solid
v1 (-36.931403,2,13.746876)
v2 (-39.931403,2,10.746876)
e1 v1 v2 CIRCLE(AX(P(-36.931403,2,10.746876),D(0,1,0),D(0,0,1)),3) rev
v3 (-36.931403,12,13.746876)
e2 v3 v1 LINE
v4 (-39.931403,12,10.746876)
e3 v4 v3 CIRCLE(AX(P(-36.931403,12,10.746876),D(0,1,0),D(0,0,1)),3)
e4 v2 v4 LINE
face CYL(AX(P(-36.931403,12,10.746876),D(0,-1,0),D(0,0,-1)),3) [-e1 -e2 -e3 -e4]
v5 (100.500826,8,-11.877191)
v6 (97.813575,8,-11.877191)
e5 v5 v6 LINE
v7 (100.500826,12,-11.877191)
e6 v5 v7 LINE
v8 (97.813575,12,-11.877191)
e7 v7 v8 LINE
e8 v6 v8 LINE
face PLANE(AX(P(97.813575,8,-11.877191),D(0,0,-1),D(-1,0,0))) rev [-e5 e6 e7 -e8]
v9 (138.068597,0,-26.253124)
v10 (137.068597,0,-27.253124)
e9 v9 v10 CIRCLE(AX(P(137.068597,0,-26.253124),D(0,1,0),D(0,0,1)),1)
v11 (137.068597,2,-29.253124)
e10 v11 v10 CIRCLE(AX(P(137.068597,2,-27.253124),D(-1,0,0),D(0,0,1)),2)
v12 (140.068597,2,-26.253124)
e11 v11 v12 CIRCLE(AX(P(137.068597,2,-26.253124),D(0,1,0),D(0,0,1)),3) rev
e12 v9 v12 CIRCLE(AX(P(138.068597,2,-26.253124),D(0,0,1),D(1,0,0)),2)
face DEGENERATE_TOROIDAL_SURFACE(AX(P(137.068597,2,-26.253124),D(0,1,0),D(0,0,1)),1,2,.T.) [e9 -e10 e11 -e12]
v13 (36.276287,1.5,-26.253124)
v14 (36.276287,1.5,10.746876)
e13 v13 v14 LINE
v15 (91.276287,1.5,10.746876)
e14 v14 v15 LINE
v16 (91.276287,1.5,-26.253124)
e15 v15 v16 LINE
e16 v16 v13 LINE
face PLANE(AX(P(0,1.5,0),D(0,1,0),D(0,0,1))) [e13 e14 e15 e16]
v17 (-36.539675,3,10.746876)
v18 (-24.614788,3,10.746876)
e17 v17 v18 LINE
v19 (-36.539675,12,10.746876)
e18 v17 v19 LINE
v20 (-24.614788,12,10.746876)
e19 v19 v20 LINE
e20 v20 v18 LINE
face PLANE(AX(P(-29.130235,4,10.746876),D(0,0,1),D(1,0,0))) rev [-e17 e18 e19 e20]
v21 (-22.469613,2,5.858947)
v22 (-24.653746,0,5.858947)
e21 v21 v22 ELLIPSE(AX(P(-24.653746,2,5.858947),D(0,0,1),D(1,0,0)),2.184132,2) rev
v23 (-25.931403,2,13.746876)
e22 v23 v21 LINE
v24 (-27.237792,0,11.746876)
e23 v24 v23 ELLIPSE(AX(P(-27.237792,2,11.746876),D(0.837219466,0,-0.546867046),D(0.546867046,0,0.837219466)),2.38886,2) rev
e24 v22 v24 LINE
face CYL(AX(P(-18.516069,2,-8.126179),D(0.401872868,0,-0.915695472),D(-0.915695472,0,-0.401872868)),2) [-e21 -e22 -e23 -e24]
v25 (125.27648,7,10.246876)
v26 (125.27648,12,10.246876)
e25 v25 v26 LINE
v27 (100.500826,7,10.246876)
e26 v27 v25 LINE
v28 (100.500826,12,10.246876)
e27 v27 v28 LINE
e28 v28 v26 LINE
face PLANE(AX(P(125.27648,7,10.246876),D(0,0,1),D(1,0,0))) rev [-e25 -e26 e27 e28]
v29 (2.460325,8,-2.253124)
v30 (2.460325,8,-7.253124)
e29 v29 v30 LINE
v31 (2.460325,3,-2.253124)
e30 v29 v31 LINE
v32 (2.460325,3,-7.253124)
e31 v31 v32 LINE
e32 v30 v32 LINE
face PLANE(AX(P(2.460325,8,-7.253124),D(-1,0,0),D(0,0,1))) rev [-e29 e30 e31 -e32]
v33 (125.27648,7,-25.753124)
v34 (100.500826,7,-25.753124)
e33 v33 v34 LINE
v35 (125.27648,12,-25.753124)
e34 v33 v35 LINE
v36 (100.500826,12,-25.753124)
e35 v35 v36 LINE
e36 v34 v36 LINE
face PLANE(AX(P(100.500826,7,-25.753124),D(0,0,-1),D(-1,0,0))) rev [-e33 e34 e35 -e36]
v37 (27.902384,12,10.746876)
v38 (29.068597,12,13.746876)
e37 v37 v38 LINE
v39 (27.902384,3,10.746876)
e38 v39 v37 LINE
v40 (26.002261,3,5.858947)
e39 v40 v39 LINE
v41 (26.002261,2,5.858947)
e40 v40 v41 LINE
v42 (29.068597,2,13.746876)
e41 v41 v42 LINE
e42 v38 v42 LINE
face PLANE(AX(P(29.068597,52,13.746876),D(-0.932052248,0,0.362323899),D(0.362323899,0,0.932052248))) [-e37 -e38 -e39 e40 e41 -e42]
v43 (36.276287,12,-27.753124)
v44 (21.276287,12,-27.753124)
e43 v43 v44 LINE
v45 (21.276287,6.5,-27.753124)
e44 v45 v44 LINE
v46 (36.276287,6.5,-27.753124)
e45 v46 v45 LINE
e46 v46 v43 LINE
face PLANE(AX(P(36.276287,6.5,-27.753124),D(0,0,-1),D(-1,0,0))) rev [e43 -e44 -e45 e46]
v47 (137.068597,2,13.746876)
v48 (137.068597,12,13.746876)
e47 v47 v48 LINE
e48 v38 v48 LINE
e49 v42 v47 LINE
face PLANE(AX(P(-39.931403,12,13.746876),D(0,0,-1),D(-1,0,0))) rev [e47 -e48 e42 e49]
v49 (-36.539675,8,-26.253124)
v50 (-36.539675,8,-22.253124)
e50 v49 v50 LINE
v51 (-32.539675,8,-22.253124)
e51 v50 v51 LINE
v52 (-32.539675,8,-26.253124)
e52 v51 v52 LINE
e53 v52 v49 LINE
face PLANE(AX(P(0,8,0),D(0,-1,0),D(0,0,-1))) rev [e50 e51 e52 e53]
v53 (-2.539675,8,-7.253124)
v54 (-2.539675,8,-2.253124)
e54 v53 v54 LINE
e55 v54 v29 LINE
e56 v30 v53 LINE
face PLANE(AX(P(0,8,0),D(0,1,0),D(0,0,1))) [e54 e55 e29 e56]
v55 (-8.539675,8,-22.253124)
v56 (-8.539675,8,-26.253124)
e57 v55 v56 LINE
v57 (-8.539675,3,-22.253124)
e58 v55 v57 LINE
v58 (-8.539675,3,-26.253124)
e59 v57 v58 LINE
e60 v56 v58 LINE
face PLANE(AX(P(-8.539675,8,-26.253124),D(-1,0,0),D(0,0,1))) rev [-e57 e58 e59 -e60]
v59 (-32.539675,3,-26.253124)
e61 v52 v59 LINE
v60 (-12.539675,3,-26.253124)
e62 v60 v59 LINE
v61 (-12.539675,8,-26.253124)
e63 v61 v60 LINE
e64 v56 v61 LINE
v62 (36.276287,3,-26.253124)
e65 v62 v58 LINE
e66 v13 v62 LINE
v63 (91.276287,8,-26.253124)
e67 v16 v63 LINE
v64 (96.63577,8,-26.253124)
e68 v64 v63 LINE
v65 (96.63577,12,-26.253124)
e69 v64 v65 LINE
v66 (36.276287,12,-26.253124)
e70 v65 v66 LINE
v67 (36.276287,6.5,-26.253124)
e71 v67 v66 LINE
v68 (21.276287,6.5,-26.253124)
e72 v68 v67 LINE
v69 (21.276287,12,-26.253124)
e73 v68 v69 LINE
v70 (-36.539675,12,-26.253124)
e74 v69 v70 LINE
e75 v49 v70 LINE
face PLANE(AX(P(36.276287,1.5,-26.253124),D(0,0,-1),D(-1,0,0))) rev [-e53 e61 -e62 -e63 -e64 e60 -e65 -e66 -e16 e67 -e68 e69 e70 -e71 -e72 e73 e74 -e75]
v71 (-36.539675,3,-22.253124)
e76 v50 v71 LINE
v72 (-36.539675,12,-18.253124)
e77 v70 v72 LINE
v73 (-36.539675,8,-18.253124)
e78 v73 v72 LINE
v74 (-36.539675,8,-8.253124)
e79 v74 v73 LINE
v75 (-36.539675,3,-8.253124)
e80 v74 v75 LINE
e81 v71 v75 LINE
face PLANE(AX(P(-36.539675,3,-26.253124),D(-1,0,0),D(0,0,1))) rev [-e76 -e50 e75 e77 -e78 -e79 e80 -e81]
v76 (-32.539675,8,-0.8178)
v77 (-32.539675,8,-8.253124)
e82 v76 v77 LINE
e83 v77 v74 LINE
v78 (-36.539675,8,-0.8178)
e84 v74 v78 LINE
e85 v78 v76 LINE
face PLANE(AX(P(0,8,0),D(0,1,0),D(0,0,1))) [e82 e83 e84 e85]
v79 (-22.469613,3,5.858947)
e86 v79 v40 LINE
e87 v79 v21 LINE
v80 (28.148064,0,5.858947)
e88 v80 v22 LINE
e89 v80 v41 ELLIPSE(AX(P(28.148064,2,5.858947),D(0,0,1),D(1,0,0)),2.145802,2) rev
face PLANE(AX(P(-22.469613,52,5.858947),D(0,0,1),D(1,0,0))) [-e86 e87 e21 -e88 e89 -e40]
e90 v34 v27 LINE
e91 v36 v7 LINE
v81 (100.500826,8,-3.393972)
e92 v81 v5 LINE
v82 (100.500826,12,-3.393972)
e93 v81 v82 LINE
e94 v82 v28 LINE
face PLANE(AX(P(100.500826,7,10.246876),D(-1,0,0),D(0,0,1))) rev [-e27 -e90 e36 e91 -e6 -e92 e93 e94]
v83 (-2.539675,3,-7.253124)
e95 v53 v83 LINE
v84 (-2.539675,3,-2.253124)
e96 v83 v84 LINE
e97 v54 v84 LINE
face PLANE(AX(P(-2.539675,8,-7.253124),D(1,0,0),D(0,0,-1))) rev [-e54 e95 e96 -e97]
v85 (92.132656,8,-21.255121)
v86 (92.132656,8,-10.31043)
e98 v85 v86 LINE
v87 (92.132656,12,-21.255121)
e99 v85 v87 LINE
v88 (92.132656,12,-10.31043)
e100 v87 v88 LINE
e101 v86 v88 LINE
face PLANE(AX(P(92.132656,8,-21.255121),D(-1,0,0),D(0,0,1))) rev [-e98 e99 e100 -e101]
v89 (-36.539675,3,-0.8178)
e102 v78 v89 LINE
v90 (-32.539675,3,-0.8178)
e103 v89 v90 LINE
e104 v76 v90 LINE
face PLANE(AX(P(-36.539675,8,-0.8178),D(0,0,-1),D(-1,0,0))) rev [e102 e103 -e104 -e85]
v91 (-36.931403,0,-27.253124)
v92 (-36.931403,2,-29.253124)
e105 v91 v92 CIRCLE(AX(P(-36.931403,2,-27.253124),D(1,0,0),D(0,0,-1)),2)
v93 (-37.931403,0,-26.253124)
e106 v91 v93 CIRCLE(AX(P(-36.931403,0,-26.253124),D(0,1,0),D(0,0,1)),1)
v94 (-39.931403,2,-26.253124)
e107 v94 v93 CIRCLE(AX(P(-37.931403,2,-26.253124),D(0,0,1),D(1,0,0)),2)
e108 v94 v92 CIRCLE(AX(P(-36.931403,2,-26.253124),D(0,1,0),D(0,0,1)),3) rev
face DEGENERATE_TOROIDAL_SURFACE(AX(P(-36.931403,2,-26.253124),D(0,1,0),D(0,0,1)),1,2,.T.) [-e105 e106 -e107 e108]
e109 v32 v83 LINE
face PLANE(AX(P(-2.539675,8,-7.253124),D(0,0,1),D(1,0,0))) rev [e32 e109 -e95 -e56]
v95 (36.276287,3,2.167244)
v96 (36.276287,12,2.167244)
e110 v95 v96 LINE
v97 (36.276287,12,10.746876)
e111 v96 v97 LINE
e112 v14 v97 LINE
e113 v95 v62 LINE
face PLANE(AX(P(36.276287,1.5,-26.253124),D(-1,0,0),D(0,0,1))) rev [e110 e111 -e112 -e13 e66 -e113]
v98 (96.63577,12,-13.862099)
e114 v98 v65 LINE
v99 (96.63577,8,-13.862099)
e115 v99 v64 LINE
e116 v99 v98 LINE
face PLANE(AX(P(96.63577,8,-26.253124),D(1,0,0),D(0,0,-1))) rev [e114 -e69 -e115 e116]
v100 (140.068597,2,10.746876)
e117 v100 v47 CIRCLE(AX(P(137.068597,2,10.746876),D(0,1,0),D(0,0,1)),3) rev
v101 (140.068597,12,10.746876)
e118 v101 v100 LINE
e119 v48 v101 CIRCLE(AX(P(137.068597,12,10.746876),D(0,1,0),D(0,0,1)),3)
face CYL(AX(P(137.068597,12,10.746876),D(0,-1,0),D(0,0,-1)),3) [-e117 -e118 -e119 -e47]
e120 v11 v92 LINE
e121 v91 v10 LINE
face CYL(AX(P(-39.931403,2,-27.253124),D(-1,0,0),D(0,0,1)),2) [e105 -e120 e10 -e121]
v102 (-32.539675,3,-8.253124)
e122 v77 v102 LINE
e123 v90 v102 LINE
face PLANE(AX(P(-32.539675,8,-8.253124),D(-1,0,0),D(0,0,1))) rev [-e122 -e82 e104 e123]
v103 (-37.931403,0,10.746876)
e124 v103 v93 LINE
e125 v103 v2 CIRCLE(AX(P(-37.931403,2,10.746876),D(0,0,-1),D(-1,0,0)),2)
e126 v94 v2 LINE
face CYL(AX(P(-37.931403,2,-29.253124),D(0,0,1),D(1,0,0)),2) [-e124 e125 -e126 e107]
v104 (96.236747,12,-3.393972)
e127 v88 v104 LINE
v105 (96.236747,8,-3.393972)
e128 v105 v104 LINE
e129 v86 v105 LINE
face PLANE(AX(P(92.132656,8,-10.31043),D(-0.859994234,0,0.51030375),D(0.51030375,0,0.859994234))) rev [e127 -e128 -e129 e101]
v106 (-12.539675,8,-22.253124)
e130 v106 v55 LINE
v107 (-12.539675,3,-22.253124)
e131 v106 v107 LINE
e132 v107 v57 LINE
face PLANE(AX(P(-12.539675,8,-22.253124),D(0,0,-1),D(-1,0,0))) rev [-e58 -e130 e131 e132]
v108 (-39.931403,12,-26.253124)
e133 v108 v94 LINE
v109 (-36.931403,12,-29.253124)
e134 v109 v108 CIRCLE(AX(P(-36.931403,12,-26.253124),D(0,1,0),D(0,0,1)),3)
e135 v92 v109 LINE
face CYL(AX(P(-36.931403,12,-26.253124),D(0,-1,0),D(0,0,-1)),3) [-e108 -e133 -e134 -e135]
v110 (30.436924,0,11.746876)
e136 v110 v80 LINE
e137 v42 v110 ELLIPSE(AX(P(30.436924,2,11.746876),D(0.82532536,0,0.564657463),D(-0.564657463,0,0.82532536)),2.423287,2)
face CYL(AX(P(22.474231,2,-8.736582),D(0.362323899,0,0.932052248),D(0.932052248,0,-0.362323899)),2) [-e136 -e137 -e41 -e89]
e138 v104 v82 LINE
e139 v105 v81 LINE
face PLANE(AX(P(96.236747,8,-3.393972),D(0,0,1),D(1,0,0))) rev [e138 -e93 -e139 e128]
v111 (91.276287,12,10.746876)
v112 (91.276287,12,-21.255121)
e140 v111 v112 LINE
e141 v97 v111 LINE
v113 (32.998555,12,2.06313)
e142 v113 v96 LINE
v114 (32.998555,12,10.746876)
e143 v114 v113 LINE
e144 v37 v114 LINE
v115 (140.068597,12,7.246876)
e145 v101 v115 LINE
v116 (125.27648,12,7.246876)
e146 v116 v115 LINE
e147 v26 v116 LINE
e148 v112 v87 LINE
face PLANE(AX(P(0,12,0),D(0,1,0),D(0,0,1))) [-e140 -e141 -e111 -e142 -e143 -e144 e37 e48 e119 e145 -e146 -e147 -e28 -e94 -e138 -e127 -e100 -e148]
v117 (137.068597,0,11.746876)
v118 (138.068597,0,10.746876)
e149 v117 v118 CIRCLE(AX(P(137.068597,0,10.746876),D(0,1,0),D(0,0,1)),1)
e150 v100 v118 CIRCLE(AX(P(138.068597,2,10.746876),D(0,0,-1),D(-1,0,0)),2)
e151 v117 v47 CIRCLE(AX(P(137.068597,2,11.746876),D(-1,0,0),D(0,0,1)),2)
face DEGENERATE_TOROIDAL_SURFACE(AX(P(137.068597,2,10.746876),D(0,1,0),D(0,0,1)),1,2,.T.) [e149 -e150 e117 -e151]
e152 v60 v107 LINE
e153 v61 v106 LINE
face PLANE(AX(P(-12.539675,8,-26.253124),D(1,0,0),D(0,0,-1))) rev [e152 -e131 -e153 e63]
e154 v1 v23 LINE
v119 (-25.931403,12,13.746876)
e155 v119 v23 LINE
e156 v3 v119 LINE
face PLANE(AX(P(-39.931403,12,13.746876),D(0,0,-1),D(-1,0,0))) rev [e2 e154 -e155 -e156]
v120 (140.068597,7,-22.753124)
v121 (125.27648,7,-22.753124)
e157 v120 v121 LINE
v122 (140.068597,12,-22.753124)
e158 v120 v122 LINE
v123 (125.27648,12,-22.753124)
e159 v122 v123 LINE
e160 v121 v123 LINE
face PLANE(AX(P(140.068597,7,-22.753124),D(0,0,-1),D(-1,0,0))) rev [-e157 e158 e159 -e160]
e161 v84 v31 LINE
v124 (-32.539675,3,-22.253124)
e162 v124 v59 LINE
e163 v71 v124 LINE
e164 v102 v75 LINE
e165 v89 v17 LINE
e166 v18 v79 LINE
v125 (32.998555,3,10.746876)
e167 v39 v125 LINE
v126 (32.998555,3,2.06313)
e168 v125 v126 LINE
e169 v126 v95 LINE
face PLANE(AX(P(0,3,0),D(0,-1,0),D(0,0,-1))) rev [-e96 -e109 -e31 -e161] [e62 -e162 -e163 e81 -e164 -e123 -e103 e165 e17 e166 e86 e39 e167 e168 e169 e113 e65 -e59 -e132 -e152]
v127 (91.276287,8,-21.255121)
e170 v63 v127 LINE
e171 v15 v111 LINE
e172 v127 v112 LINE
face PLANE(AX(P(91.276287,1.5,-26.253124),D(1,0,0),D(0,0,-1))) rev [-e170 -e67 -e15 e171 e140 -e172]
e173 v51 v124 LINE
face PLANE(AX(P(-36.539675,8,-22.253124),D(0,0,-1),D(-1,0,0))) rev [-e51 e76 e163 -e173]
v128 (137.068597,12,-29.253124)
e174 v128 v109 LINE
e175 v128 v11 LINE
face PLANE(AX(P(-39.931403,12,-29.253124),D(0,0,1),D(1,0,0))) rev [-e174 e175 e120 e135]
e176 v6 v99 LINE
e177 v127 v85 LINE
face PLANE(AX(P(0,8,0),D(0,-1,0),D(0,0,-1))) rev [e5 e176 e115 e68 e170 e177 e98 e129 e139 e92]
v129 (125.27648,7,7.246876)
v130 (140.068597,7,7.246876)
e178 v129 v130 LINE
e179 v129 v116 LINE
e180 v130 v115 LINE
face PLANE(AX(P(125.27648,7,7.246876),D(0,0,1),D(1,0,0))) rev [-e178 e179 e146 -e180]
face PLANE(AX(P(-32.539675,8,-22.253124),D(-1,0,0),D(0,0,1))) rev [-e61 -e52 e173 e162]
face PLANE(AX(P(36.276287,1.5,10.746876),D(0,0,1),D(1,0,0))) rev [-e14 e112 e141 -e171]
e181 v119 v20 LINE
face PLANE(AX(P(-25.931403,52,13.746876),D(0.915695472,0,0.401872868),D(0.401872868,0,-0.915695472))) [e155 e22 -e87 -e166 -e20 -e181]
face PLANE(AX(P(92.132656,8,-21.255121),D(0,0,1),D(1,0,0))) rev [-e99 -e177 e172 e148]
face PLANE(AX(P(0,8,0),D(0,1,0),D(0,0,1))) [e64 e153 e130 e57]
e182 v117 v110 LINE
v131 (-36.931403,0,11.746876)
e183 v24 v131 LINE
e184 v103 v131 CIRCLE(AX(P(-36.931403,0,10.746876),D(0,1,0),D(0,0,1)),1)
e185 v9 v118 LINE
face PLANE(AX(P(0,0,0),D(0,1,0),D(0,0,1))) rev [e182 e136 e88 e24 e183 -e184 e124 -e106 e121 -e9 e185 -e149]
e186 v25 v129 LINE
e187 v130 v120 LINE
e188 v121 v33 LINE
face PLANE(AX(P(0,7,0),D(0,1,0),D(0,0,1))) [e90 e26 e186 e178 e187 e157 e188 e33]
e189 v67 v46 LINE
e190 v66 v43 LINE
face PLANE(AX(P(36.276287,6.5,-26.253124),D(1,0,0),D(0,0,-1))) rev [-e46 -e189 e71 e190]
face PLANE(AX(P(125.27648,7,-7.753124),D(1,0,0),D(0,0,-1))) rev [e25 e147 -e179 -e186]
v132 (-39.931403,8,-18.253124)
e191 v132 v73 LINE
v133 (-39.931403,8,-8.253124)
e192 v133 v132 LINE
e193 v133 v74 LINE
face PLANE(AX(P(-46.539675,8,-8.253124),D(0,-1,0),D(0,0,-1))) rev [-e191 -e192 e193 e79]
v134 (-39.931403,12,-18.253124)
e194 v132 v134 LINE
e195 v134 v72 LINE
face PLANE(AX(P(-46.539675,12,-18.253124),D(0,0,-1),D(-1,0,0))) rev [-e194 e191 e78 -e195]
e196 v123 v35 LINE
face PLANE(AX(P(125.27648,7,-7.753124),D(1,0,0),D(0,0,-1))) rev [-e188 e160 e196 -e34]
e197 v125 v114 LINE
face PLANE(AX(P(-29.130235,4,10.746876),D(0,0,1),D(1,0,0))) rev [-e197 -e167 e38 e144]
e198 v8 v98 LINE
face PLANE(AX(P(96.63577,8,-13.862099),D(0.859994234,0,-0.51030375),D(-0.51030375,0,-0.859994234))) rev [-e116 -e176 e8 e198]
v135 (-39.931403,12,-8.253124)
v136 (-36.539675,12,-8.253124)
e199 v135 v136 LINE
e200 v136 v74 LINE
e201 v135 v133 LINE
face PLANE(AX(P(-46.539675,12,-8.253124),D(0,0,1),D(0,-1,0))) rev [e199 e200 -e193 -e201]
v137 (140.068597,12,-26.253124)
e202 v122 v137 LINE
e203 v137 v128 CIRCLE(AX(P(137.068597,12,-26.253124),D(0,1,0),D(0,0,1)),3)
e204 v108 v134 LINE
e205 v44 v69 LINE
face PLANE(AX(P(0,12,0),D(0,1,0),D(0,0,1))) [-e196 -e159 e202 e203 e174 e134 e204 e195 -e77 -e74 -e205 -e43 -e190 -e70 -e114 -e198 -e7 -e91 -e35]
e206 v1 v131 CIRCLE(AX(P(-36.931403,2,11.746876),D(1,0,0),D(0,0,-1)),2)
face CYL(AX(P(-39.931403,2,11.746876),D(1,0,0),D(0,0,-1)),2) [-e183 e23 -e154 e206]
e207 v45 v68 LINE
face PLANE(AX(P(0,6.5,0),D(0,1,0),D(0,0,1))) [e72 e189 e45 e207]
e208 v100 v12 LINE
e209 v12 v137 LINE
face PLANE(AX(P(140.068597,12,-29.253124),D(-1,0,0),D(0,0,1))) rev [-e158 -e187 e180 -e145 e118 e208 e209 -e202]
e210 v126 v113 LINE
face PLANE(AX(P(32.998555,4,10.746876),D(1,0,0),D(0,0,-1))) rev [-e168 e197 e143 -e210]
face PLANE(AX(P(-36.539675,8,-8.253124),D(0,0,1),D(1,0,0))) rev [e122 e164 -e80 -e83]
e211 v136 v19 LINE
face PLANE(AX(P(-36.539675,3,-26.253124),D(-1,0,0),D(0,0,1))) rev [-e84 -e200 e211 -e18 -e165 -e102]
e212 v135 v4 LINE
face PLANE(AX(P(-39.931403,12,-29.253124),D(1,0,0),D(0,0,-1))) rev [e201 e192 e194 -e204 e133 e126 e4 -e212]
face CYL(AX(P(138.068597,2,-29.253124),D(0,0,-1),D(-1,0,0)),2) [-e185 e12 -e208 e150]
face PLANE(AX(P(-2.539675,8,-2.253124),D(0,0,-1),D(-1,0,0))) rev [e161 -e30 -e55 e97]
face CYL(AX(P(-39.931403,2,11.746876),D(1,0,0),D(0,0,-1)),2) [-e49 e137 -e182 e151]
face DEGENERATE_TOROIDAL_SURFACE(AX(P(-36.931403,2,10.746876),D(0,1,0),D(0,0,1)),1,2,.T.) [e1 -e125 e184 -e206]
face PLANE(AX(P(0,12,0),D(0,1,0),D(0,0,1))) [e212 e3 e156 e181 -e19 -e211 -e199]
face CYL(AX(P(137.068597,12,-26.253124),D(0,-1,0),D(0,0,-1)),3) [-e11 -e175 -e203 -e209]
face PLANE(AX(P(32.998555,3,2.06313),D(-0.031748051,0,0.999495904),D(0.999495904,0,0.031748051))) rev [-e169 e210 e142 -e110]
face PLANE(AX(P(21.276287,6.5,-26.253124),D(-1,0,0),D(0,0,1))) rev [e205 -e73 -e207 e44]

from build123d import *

# Parameters (mm, degrees)
SKETCH_3_W           = 180
SKETCH_3_H           = 43
EXTRUDE_1_DEPTH      = 12
CUT_EXTRUDE_1_DEPTH  = 52
CUT_EXTRUDE_2_DEPTH  = 5
CUT_EXTRUDE_3_DEPTH  = 5
SKETCH_8_W           = 55
SKETCH_8_H           = 37
CUT_EXTRUDE_4_DEPTH  = 10.5
CUT_EXTRUDE_5_DEPTH  = 4
SKETCH_10_W          = 62.128790526
SKETCH_10_H          = 8.683746703
CUT_EXTRUDE_6_DEPTH  = 8
CUT_EXTRUDE_8_DEPTH  = 9
FILLET_2_R           = 2
FILLET_3_R           = 3
SKETCH_12_W          = 10
SKETCH_12_H          = 4
CUT_EXTRUDE_9_DEPTH  = 10
SKETCH_13_W          = 4
SKETCH_13_H          = 4
SKETCH_13_H_2        = 7.435323836
SKETCH_13_W_2        = 5
SKETCH_13_H_3        = 5
EXTRUDE_2_DEPTH      = 5
SKETCH_14_W          = 15
SKETCH_14_H          = 1.5
CUT_EXTRUDE_10_DEPTH = 5.5


with BuildPart() as part:
    # 草图3 → 凸台-拉伸1 (new body)
    with BuildSketch(Plane(origin=(0, 0, 0), x_dir=(1, 0, 0), z_dir=(0, 1, 0))):
        with Locations((50.068597249, 7.753123643)):
            Rectangle(SKETCH_3_W, SKETCH_3_H)
    extrude(amount=EXTRUDE_1_DEPTH)

    # 草图4 → 切除-拉伸1 (cut)
    with BuildSketch(Plane(origin=(0, 0, 0), x_dir=(1, 0, 0), z_dir=(0, 1, 0))):
        Polygon((-22.469613434, -5.858946979), (26.002261286, -5.858946979), (29.068597249, -13.746876357), (-25.931402751, -13.746876357), align=None)
    extrude(amount=CUT_EXTRUDE_1_DEPTH, mode=Mode.SUBTRACT)

    # 草图5 → 切除-拉伸2 (cut)
    with BuildSketch(Plane(origin=(0, 12, 0), x_dir=(1, 0, 0), z_dir=(0, 1, 0))):
        Polygon((140.068597249, 7.753123643), (140.068597249, 22.753123643), (125.276479966, 22.753123643), (125.276479966, -7.246876357), (140.068597249, -7.246876357), align=None)
    extrude(amount=-CUT_EXTRUDE_2_DEPTH, mode=Mode.SUBTRACT)

    # 草图7 → 切除-拉伸3 (cut)
    with BuildSketch(Plane(origin=(0, 12, 0), x_dir=(1, 0, 0), z_dir=(0, 1, 0))):
        Polygon((125.276479966, 7.753123643), (125.276479966, 25.753123643), (100.500825538, 25.753123643), (100.500825538, -10.246876357), (125.276479966, -10.246876357), align=None)
    extrude(amount=-CUT_EXTRUDE_3_DEPTH, mode=Mode.SUBTRACT)

    # 草图8 → 切除-拉伸4 (cut)
    with BuildSketch(Plane(origin=(0, 12, 0), x_dir=(1, 0, 0), z_dir=(0, 1, 0))):
        with Locations((63.776287419, 7.753123643)):
            Rectangle(SKETCH_8_W, SKETCH_8_H)
    extrude(amount=-CUT_EXTRUDE_4_DEPTH, mode=Mode.SUBTRACT)

    # 草图9 → 切除-拉伸5 (cut)
    with BuildSketch(Plane(origin=(0, 12, 0), x_dir=(1, 0, 0), z_dir=(0, 1, 0))):
        Polygon((91.276287419, 26.253123643), (96.635770173, 26.253123643), (96.635770173, 22.130591531), (96.635770173, 13.862098754), (97.813575381, 11.877191358), (100.500825538, 11.877191358), (100.500825538, 3.393971617), (96.236747254, 3.393971617), (92.132656028, 10.310430274), (92.132656028, 21.255120764), (91.276287419, 21.255120764), align=None)
    extrude(amount=-CUT_EXTRUDE_5_DEPTH, mode=Mode.SUBTRACT)

    # 草图10 → 切除-拉伸6 (cut)
    with BuildSketch(Plane(origin=(0, 12, 0), x_dir=(1, 0, 0), z_dir=(0, 1, 0))):
        with Locations((1.934159822, -6.405003006)):
            Rectangle(SKETCH_10_W, SKETCH_10_H)
    extrude(amount=-CUT_EXTRUDE_6_DEPTH, mode=Mode.SUBTRACT)

    # 草图11 → 切除-拉伸8 (cut)
    with BuildSketch(Plane(origin=(0, 12, 0), x_dir=(1, 0, 0), z_dir=(0, 1, 0))):
        Polygon((32.998555085, -10.746876357), (-36.5396752, -10.746876357), (-36.5396752, 26.253123643), (36.276287419, 26.253123643), (36.276287419, -2.167243749), (32.998555085, -2.063129654), align=None)
    extrude(amount=-CUT_EXTRUDE_8_DEPTH, mode=Mode.SUBTRACT)

    # 圆角2
    fillet_2_edges = [part.edges().sort_by_distance(p)[0] for p in [
        (84.568597249, 0, 13.746876357),
        (-24.200508092, 0, 9.802911668),
        (27.535429268, 0, 9.802911668),
        (50.068597249, 0, -29.253123643),
        (140.068597249, 0, -7.753123643),
        (-32.931402751, 0, 13.746876357),
        (-39.931402751, 0, -7.753123643),
    ]]
    fillet(fillet_2_edges, radius=FILLET_2_R)

    # 圆角3
    # the kernel refuses this fillet: 3 mm, written as the material it takes off along each edge
    with BuildSketch(Plane(origin=(-36.931402751, 0, 10.746876357), x_dir=(0, 0, 1), z_dir=(1, 0, 0))) as fillet_3_piece_1:
        with BuildLine():
            CenterArc((1, -2), 2, 0, 90)
            Line((3, -2), (3, 0))
            Line((3, 0), (1, 0))
        make_face()
    revolve(axis=Axis((-36.931402751, 0, 10.746876357), (0, -1, 0)), revolution_arc=90, mode=Mode.SUBTRACT)
    with BuildSketch(Plane(origin=(-36.931402751, 0, -26.253123643), x_dir=(-1, 0, 0), z_dir=(0, 0, 1))) as fillet_3_piece_2:
        with BuildLine():
            CenterArc((1, -2), 2, 0, 90)
            Line((3, -2), (3, 0))
            Line((3, 0), (1, 0))
        make_face()
    revolve(axis=Axis((-36.931402751, 0, -26.253123643), (0, -1, 0)), revolution_arc=90, mode=Mode.SUBTRACT)
    with BuildSketch(Plane(origin=(137.068597249, 0, 10.746876357), x_dir=(1, 0, 0), z_dir=(0, 0, -1))) as fillet_3_piece_3:
        with BuildLine():
            CenterArc((1, -2), 2, 0, 90)
            Line((3, -2), (3, 0))
            Line((3, 0), (1, 0))
        make_face()
    revolve(axis=Axis((137.068597249, 0, 10.746876357), (0, -1, 0)), revolution_arc=90, mode=Mode.SUBTRACT)
    with BuildSketch(Plane(origin=(137.068597249, 0, -26.253123643), x_dir=(0, 0, -1), z_dir=(-1, 0, 0))) as fillet_3_piece_4:
        with BuildLine():
            CenterArc((1, -2), 2, 0, 90)
            Line((3, -2), (3, 0))
            Line((3, 0), (1, 0))
        make_face()
    revolve(axis=Axis((137.068597249, 0, -26.253123643), (0, -1, 0)), revolution_arc=90, mode=Mode.SUBTRACT)
    with BuildSketch(Plane(origin=(-39.931402751, 0, -29.253123643), x_dir=(1, 0, 0), z_dir=(0, 1, 0))) as fillet_3_piece_5:
        with BuildLine():
            CenterArc((FILLET_3_R, -FILLET_3_R), FILLET_3_R, 90, 90)
            Line((0, -FILLET_3_R), (0, 0))
            Line((0, 0), (FILLET_3_R, 0))
        make_face()
    extrude(amount=19.5, mode=Mode.SUBTRACT)
    with BuildSketch(Plane(origin=(140.068597249, 0, -29.253123643), x_dir=(-1, 0, 0), z_dir=(0, 1, 0)), Plane(origin=(140.068597249, 0, 13.746876357), x_dir=(0, 0, -1), z_dir=(0, 1, 0)), Plane(origin=(-39.931402751, 0, 13.746876357), x_dir=(1, 0, 0), z_dir=(0, 1, 0))) as fillet_3_piece_6:
        with BuildLine():
            CenterArc((FILLET_3_R, FILLET_3_R), FILLET_3_R, 180, 90)
            Line((0, FILLET_3_R), (0, 0))
            Line((0, 0), (FILLET_3_R, 0))
        make_face()
    extrude(amount=19.5, mode=Mode.SUBTRACT)

    # 草图12 → 切除-拉伸9 (cut)
    with BuildSketch(Plane(origin=(-36.5396752, 0, 0), x_dir=(0, 0, -1), z_dir=(1, 0, 0))):
        with Locations((13.253123643, 10)):
            Rectangle(SKETCH_12_W, SKETCH_12_H)
    extrude(amount=-CUT_EXTRUDE_9_DEPTH, mode=Mode.SUBTRACT)

    # 草图13 → 凸台-拉伸2 (add)
    with BuildSketch(Plane(origin=(0, 3, 0), x_dir=(1, 0, 0), z_dir=(0, 1, 0))):
        with Locations((-34.5396752, 24.253123643)):
            Rectangle(SKETCH_13_W, SKETCH_13_H)
        with Locations((-34.5396752, 4.535461725)):
            Rectangle(SKETCH_13_W, SKETCH_13_H_2)
        with Locations((-10.5396752, 24.253123643)):
            Rectangle(SKETCH_13_W, SKETCH_13_H)
        with Locations((-0.0396752, 4.753123643)):
            Rectangle(SKETCH_13_W_2, SKETCH_13_H_3)
    extrude(amount=EXTRUDE_2_DEPTH)

    # 草图14 → 切除-拉伸10 (cut)
    with BuildSketch(Plane(origin=(0, 12, 0), x_dir=(1, 0, 0), z_dir=(0, 1, 0))):
        with Locations((28.776287419, 27.003123643)):
            Rectangle(SKETCH_14_W, SKETCH_14_H)
    extrude(amount=-CUT_EXTRUDE_10_DEPTH, mode=Mode.SUBTRACT)


solid = part.part
